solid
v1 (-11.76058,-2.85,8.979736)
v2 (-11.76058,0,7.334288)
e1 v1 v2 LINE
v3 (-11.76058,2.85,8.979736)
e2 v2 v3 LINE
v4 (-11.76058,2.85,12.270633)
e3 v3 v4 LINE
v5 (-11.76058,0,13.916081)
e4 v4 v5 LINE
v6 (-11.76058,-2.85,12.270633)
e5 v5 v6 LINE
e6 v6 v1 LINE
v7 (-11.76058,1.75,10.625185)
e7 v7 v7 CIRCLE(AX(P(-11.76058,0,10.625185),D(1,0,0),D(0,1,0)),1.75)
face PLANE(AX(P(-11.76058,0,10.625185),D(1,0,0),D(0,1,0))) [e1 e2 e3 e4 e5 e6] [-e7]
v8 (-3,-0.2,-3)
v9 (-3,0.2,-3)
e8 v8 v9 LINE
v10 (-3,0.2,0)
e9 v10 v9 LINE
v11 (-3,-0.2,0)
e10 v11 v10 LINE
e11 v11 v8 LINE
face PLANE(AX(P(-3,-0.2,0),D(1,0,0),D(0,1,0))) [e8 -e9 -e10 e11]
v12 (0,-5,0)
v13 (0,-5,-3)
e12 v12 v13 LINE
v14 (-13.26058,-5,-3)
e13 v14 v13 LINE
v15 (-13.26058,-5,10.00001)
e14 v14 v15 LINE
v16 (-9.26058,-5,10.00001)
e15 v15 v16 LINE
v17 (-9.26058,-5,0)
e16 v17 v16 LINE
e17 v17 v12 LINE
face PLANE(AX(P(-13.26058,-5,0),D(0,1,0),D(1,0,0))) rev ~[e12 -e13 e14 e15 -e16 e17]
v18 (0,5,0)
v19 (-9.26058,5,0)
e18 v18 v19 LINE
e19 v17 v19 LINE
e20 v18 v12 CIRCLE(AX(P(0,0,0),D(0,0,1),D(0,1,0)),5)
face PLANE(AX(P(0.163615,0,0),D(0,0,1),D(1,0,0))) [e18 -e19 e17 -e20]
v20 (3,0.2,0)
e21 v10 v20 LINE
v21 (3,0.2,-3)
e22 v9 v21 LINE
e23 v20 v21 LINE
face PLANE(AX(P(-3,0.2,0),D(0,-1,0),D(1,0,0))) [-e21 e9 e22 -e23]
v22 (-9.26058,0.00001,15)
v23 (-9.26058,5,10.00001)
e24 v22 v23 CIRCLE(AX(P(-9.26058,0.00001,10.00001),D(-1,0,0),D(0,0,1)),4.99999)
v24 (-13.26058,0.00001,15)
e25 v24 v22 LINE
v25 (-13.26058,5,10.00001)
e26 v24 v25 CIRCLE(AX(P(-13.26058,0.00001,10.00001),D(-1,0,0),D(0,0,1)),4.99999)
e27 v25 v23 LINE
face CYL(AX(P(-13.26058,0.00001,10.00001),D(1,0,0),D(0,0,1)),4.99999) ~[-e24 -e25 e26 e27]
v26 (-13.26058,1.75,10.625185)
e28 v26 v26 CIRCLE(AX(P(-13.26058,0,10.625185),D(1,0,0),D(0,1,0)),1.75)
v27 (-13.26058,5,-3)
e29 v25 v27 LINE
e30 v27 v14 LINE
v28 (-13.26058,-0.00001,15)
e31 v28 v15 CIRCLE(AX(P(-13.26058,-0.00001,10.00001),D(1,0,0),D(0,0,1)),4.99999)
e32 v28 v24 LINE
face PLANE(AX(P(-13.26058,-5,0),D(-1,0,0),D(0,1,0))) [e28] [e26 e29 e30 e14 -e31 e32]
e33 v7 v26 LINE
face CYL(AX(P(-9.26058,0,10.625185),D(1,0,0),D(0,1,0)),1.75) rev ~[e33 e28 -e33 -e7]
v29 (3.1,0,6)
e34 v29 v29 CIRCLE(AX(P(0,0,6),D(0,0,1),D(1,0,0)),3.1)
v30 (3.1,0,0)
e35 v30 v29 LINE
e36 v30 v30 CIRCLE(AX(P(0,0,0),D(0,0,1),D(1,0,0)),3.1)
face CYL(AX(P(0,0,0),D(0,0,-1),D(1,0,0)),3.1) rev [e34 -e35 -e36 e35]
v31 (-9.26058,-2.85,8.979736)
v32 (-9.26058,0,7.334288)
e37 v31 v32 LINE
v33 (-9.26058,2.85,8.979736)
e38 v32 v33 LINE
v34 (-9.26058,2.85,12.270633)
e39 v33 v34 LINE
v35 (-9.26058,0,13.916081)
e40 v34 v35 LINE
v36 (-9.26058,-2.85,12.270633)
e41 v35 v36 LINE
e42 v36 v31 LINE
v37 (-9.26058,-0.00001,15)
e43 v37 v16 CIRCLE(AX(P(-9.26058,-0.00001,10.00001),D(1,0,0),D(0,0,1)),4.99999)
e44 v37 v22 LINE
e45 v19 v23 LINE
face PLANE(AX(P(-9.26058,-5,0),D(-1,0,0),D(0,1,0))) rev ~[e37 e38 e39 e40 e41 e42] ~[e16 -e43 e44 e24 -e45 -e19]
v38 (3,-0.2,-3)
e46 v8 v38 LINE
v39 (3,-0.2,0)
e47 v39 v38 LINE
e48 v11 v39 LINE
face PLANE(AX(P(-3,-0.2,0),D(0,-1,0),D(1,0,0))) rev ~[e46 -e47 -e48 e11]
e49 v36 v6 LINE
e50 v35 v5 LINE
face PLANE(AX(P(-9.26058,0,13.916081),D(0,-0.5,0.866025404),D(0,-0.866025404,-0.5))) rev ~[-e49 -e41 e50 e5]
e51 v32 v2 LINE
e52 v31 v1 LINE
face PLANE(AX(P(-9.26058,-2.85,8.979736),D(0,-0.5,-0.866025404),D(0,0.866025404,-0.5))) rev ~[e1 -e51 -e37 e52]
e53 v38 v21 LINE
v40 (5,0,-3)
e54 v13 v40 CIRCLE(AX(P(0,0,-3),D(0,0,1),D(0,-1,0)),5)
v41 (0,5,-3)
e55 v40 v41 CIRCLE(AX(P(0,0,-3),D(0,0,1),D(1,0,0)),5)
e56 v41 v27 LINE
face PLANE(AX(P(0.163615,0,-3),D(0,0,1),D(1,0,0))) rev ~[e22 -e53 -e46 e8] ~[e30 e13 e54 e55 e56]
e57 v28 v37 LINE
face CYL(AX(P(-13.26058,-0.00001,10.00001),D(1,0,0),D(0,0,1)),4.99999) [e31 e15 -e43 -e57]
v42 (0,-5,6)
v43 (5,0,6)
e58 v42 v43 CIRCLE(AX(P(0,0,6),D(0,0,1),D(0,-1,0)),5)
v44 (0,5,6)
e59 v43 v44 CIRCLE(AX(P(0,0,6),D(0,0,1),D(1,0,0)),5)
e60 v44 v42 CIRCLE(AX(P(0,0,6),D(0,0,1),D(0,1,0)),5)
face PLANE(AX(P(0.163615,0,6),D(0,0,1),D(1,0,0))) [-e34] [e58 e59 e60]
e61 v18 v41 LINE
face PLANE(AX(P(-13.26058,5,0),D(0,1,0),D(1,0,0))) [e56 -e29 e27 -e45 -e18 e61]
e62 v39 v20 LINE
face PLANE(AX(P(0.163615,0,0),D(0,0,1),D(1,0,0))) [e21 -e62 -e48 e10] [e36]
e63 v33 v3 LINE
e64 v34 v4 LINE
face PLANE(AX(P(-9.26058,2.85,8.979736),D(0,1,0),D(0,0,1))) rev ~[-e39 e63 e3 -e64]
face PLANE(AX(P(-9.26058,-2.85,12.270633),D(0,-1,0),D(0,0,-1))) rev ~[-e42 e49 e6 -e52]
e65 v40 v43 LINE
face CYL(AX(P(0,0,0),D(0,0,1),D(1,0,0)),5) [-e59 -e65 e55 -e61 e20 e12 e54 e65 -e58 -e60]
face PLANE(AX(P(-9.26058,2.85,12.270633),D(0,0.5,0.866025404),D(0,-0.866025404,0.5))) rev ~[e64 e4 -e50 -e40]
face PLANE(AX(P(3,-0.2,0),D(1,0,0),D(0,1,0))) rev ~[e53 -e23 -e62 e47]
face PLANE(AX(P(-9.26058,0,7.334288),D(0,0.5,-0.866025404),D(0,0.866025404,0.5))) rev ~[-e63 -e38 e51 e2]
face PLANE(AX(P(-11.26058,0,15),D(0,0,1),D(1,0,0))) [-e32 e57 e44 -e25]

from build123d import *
from build123d import SkipClean  # not in build123d's __all__

# Parameters (mm, degrees)
F0_R      = 3.1
F0_R_2    = 1
F1_DEPTH  = 3
F2_DEPTH  = 6
F3_W      = 4
F3_H      = 10
F4_DEPTH  = 15
F5_R      = 1.75
F6_DEPTH  = 25
F8_DEPTH  = 2.5
F9_R      = 4.99999
F10_W     = 6
F10_H     = 0.4
F11_DEPTH = 25


# Not quite as in the source:
# - a fillet or chamfer is up to 0.001 mm smaller than in the source, because OpenCascade refuses the exact size
# - after a boolean that leaves OpenCascade's solid faulty, fix() repairs it


with BuildPart() as f1:
    # F0 (on Top) → F1 (new body)
    with BuildSketch(Plane.XY):
        with BuildLine():
            ThreePointArc((0, -5), (3.5355339059, -3.5355339059), (5, 0))
            ThreePointArc((5, 0), (3.5355339059, 3.5355339059), (0, 5))
            ThreePointArc((0, 5), (-5, 0), (0, -5))
        make_face()
        Circle(F0_R, mode=Mode.SUBTRACT)
        Circle(F0_R)
        Circle(F0_R_2, mode=Mode.SUBTRACT)
        with BuildLine():
            ThreePointArc((0, -5), (-5, 0), (0, 5))
            Line((0, 5), (-13.260579668, 5))
            Line((-13.260579668, 5), (-13.260579668, -5))
            Line((-13.260579668, -5), (0, -5))
        make_face()
        Circle(F0_R_2)
    extrude(amount=-F1_DEPTH)

    # F0 (on Top) → F2 (join)
    with BuildSketch(Plane.XY):
        with BuildLine():
            ThreePointArc((0, -5), (3.5355339059, -3.5355339059), (5, 0))
            ThreePointArc((5, 0), (3.5355339059, 3.5355339059), (0, 5))
            ThreePointArc((0, 5), (-5, 0), (0, -5))
        make_face()
        Circle(F0_R, mode=Mode.SUBTRACT)
    with SkipClean():  # cleaning this boolean's faces spoils the solid; the shape is the same uncleaned
        extrude(amount=F2_DEPTH)

    # F3 (on face) → F4 (join)
    with BuildSketch(Plane.XY):
        with Locations((-11.260579668, 0)):
            Rectangle(F3_W, F3_H)
    extrude(amount=F4_DEPTH)

    add(f1.part.fix(), mode=Mode.REPLACE)

    # F5 (on face) → F6 (cut)
    with BuildSketch(Plane.YZ.offset(-9.260579668)):
        with Locations((0, 10.6251845136)):
            Circle(F5_R)
    extrude(amount=-F6_DEPTH, mode=Mode.SUBTRACT)

    # F7 (on face) → F8 (cut)
    with BuildSketch(Plane.YZ.offset(-9.260579668)):
        Polygon((0, 7.3342879792), (2.85, 8.9797362464), (2.85, 12.2706327808), (0, 13.916081048), (-2.85, 12.2706327808), (-2.85, 8.9797362464), align=None)
    extrude(amount=-F8_DEPTH, mode=Mode.SUBTRACT)

    # F9 (radius 5 in the source; OpenCascade refuses exactly that, so slightly less here)
    f9_edges = [f1.edges().sort_by_distance(p)[0] for p in [
        (-11.26058, -5, 15),
        (-11.26058, 5, 15),
    ]]
    fillet(f9_edges, radius=F9_R)

    # F10 (on face) → F11 (cut)
    with BuildSketch(Plane.XY):
        Rectangle(F10_W, F10_H)
    extrude(amount=-F11_DEPTH, mode=Mode.SUBTRACT)


solid = f1.part
